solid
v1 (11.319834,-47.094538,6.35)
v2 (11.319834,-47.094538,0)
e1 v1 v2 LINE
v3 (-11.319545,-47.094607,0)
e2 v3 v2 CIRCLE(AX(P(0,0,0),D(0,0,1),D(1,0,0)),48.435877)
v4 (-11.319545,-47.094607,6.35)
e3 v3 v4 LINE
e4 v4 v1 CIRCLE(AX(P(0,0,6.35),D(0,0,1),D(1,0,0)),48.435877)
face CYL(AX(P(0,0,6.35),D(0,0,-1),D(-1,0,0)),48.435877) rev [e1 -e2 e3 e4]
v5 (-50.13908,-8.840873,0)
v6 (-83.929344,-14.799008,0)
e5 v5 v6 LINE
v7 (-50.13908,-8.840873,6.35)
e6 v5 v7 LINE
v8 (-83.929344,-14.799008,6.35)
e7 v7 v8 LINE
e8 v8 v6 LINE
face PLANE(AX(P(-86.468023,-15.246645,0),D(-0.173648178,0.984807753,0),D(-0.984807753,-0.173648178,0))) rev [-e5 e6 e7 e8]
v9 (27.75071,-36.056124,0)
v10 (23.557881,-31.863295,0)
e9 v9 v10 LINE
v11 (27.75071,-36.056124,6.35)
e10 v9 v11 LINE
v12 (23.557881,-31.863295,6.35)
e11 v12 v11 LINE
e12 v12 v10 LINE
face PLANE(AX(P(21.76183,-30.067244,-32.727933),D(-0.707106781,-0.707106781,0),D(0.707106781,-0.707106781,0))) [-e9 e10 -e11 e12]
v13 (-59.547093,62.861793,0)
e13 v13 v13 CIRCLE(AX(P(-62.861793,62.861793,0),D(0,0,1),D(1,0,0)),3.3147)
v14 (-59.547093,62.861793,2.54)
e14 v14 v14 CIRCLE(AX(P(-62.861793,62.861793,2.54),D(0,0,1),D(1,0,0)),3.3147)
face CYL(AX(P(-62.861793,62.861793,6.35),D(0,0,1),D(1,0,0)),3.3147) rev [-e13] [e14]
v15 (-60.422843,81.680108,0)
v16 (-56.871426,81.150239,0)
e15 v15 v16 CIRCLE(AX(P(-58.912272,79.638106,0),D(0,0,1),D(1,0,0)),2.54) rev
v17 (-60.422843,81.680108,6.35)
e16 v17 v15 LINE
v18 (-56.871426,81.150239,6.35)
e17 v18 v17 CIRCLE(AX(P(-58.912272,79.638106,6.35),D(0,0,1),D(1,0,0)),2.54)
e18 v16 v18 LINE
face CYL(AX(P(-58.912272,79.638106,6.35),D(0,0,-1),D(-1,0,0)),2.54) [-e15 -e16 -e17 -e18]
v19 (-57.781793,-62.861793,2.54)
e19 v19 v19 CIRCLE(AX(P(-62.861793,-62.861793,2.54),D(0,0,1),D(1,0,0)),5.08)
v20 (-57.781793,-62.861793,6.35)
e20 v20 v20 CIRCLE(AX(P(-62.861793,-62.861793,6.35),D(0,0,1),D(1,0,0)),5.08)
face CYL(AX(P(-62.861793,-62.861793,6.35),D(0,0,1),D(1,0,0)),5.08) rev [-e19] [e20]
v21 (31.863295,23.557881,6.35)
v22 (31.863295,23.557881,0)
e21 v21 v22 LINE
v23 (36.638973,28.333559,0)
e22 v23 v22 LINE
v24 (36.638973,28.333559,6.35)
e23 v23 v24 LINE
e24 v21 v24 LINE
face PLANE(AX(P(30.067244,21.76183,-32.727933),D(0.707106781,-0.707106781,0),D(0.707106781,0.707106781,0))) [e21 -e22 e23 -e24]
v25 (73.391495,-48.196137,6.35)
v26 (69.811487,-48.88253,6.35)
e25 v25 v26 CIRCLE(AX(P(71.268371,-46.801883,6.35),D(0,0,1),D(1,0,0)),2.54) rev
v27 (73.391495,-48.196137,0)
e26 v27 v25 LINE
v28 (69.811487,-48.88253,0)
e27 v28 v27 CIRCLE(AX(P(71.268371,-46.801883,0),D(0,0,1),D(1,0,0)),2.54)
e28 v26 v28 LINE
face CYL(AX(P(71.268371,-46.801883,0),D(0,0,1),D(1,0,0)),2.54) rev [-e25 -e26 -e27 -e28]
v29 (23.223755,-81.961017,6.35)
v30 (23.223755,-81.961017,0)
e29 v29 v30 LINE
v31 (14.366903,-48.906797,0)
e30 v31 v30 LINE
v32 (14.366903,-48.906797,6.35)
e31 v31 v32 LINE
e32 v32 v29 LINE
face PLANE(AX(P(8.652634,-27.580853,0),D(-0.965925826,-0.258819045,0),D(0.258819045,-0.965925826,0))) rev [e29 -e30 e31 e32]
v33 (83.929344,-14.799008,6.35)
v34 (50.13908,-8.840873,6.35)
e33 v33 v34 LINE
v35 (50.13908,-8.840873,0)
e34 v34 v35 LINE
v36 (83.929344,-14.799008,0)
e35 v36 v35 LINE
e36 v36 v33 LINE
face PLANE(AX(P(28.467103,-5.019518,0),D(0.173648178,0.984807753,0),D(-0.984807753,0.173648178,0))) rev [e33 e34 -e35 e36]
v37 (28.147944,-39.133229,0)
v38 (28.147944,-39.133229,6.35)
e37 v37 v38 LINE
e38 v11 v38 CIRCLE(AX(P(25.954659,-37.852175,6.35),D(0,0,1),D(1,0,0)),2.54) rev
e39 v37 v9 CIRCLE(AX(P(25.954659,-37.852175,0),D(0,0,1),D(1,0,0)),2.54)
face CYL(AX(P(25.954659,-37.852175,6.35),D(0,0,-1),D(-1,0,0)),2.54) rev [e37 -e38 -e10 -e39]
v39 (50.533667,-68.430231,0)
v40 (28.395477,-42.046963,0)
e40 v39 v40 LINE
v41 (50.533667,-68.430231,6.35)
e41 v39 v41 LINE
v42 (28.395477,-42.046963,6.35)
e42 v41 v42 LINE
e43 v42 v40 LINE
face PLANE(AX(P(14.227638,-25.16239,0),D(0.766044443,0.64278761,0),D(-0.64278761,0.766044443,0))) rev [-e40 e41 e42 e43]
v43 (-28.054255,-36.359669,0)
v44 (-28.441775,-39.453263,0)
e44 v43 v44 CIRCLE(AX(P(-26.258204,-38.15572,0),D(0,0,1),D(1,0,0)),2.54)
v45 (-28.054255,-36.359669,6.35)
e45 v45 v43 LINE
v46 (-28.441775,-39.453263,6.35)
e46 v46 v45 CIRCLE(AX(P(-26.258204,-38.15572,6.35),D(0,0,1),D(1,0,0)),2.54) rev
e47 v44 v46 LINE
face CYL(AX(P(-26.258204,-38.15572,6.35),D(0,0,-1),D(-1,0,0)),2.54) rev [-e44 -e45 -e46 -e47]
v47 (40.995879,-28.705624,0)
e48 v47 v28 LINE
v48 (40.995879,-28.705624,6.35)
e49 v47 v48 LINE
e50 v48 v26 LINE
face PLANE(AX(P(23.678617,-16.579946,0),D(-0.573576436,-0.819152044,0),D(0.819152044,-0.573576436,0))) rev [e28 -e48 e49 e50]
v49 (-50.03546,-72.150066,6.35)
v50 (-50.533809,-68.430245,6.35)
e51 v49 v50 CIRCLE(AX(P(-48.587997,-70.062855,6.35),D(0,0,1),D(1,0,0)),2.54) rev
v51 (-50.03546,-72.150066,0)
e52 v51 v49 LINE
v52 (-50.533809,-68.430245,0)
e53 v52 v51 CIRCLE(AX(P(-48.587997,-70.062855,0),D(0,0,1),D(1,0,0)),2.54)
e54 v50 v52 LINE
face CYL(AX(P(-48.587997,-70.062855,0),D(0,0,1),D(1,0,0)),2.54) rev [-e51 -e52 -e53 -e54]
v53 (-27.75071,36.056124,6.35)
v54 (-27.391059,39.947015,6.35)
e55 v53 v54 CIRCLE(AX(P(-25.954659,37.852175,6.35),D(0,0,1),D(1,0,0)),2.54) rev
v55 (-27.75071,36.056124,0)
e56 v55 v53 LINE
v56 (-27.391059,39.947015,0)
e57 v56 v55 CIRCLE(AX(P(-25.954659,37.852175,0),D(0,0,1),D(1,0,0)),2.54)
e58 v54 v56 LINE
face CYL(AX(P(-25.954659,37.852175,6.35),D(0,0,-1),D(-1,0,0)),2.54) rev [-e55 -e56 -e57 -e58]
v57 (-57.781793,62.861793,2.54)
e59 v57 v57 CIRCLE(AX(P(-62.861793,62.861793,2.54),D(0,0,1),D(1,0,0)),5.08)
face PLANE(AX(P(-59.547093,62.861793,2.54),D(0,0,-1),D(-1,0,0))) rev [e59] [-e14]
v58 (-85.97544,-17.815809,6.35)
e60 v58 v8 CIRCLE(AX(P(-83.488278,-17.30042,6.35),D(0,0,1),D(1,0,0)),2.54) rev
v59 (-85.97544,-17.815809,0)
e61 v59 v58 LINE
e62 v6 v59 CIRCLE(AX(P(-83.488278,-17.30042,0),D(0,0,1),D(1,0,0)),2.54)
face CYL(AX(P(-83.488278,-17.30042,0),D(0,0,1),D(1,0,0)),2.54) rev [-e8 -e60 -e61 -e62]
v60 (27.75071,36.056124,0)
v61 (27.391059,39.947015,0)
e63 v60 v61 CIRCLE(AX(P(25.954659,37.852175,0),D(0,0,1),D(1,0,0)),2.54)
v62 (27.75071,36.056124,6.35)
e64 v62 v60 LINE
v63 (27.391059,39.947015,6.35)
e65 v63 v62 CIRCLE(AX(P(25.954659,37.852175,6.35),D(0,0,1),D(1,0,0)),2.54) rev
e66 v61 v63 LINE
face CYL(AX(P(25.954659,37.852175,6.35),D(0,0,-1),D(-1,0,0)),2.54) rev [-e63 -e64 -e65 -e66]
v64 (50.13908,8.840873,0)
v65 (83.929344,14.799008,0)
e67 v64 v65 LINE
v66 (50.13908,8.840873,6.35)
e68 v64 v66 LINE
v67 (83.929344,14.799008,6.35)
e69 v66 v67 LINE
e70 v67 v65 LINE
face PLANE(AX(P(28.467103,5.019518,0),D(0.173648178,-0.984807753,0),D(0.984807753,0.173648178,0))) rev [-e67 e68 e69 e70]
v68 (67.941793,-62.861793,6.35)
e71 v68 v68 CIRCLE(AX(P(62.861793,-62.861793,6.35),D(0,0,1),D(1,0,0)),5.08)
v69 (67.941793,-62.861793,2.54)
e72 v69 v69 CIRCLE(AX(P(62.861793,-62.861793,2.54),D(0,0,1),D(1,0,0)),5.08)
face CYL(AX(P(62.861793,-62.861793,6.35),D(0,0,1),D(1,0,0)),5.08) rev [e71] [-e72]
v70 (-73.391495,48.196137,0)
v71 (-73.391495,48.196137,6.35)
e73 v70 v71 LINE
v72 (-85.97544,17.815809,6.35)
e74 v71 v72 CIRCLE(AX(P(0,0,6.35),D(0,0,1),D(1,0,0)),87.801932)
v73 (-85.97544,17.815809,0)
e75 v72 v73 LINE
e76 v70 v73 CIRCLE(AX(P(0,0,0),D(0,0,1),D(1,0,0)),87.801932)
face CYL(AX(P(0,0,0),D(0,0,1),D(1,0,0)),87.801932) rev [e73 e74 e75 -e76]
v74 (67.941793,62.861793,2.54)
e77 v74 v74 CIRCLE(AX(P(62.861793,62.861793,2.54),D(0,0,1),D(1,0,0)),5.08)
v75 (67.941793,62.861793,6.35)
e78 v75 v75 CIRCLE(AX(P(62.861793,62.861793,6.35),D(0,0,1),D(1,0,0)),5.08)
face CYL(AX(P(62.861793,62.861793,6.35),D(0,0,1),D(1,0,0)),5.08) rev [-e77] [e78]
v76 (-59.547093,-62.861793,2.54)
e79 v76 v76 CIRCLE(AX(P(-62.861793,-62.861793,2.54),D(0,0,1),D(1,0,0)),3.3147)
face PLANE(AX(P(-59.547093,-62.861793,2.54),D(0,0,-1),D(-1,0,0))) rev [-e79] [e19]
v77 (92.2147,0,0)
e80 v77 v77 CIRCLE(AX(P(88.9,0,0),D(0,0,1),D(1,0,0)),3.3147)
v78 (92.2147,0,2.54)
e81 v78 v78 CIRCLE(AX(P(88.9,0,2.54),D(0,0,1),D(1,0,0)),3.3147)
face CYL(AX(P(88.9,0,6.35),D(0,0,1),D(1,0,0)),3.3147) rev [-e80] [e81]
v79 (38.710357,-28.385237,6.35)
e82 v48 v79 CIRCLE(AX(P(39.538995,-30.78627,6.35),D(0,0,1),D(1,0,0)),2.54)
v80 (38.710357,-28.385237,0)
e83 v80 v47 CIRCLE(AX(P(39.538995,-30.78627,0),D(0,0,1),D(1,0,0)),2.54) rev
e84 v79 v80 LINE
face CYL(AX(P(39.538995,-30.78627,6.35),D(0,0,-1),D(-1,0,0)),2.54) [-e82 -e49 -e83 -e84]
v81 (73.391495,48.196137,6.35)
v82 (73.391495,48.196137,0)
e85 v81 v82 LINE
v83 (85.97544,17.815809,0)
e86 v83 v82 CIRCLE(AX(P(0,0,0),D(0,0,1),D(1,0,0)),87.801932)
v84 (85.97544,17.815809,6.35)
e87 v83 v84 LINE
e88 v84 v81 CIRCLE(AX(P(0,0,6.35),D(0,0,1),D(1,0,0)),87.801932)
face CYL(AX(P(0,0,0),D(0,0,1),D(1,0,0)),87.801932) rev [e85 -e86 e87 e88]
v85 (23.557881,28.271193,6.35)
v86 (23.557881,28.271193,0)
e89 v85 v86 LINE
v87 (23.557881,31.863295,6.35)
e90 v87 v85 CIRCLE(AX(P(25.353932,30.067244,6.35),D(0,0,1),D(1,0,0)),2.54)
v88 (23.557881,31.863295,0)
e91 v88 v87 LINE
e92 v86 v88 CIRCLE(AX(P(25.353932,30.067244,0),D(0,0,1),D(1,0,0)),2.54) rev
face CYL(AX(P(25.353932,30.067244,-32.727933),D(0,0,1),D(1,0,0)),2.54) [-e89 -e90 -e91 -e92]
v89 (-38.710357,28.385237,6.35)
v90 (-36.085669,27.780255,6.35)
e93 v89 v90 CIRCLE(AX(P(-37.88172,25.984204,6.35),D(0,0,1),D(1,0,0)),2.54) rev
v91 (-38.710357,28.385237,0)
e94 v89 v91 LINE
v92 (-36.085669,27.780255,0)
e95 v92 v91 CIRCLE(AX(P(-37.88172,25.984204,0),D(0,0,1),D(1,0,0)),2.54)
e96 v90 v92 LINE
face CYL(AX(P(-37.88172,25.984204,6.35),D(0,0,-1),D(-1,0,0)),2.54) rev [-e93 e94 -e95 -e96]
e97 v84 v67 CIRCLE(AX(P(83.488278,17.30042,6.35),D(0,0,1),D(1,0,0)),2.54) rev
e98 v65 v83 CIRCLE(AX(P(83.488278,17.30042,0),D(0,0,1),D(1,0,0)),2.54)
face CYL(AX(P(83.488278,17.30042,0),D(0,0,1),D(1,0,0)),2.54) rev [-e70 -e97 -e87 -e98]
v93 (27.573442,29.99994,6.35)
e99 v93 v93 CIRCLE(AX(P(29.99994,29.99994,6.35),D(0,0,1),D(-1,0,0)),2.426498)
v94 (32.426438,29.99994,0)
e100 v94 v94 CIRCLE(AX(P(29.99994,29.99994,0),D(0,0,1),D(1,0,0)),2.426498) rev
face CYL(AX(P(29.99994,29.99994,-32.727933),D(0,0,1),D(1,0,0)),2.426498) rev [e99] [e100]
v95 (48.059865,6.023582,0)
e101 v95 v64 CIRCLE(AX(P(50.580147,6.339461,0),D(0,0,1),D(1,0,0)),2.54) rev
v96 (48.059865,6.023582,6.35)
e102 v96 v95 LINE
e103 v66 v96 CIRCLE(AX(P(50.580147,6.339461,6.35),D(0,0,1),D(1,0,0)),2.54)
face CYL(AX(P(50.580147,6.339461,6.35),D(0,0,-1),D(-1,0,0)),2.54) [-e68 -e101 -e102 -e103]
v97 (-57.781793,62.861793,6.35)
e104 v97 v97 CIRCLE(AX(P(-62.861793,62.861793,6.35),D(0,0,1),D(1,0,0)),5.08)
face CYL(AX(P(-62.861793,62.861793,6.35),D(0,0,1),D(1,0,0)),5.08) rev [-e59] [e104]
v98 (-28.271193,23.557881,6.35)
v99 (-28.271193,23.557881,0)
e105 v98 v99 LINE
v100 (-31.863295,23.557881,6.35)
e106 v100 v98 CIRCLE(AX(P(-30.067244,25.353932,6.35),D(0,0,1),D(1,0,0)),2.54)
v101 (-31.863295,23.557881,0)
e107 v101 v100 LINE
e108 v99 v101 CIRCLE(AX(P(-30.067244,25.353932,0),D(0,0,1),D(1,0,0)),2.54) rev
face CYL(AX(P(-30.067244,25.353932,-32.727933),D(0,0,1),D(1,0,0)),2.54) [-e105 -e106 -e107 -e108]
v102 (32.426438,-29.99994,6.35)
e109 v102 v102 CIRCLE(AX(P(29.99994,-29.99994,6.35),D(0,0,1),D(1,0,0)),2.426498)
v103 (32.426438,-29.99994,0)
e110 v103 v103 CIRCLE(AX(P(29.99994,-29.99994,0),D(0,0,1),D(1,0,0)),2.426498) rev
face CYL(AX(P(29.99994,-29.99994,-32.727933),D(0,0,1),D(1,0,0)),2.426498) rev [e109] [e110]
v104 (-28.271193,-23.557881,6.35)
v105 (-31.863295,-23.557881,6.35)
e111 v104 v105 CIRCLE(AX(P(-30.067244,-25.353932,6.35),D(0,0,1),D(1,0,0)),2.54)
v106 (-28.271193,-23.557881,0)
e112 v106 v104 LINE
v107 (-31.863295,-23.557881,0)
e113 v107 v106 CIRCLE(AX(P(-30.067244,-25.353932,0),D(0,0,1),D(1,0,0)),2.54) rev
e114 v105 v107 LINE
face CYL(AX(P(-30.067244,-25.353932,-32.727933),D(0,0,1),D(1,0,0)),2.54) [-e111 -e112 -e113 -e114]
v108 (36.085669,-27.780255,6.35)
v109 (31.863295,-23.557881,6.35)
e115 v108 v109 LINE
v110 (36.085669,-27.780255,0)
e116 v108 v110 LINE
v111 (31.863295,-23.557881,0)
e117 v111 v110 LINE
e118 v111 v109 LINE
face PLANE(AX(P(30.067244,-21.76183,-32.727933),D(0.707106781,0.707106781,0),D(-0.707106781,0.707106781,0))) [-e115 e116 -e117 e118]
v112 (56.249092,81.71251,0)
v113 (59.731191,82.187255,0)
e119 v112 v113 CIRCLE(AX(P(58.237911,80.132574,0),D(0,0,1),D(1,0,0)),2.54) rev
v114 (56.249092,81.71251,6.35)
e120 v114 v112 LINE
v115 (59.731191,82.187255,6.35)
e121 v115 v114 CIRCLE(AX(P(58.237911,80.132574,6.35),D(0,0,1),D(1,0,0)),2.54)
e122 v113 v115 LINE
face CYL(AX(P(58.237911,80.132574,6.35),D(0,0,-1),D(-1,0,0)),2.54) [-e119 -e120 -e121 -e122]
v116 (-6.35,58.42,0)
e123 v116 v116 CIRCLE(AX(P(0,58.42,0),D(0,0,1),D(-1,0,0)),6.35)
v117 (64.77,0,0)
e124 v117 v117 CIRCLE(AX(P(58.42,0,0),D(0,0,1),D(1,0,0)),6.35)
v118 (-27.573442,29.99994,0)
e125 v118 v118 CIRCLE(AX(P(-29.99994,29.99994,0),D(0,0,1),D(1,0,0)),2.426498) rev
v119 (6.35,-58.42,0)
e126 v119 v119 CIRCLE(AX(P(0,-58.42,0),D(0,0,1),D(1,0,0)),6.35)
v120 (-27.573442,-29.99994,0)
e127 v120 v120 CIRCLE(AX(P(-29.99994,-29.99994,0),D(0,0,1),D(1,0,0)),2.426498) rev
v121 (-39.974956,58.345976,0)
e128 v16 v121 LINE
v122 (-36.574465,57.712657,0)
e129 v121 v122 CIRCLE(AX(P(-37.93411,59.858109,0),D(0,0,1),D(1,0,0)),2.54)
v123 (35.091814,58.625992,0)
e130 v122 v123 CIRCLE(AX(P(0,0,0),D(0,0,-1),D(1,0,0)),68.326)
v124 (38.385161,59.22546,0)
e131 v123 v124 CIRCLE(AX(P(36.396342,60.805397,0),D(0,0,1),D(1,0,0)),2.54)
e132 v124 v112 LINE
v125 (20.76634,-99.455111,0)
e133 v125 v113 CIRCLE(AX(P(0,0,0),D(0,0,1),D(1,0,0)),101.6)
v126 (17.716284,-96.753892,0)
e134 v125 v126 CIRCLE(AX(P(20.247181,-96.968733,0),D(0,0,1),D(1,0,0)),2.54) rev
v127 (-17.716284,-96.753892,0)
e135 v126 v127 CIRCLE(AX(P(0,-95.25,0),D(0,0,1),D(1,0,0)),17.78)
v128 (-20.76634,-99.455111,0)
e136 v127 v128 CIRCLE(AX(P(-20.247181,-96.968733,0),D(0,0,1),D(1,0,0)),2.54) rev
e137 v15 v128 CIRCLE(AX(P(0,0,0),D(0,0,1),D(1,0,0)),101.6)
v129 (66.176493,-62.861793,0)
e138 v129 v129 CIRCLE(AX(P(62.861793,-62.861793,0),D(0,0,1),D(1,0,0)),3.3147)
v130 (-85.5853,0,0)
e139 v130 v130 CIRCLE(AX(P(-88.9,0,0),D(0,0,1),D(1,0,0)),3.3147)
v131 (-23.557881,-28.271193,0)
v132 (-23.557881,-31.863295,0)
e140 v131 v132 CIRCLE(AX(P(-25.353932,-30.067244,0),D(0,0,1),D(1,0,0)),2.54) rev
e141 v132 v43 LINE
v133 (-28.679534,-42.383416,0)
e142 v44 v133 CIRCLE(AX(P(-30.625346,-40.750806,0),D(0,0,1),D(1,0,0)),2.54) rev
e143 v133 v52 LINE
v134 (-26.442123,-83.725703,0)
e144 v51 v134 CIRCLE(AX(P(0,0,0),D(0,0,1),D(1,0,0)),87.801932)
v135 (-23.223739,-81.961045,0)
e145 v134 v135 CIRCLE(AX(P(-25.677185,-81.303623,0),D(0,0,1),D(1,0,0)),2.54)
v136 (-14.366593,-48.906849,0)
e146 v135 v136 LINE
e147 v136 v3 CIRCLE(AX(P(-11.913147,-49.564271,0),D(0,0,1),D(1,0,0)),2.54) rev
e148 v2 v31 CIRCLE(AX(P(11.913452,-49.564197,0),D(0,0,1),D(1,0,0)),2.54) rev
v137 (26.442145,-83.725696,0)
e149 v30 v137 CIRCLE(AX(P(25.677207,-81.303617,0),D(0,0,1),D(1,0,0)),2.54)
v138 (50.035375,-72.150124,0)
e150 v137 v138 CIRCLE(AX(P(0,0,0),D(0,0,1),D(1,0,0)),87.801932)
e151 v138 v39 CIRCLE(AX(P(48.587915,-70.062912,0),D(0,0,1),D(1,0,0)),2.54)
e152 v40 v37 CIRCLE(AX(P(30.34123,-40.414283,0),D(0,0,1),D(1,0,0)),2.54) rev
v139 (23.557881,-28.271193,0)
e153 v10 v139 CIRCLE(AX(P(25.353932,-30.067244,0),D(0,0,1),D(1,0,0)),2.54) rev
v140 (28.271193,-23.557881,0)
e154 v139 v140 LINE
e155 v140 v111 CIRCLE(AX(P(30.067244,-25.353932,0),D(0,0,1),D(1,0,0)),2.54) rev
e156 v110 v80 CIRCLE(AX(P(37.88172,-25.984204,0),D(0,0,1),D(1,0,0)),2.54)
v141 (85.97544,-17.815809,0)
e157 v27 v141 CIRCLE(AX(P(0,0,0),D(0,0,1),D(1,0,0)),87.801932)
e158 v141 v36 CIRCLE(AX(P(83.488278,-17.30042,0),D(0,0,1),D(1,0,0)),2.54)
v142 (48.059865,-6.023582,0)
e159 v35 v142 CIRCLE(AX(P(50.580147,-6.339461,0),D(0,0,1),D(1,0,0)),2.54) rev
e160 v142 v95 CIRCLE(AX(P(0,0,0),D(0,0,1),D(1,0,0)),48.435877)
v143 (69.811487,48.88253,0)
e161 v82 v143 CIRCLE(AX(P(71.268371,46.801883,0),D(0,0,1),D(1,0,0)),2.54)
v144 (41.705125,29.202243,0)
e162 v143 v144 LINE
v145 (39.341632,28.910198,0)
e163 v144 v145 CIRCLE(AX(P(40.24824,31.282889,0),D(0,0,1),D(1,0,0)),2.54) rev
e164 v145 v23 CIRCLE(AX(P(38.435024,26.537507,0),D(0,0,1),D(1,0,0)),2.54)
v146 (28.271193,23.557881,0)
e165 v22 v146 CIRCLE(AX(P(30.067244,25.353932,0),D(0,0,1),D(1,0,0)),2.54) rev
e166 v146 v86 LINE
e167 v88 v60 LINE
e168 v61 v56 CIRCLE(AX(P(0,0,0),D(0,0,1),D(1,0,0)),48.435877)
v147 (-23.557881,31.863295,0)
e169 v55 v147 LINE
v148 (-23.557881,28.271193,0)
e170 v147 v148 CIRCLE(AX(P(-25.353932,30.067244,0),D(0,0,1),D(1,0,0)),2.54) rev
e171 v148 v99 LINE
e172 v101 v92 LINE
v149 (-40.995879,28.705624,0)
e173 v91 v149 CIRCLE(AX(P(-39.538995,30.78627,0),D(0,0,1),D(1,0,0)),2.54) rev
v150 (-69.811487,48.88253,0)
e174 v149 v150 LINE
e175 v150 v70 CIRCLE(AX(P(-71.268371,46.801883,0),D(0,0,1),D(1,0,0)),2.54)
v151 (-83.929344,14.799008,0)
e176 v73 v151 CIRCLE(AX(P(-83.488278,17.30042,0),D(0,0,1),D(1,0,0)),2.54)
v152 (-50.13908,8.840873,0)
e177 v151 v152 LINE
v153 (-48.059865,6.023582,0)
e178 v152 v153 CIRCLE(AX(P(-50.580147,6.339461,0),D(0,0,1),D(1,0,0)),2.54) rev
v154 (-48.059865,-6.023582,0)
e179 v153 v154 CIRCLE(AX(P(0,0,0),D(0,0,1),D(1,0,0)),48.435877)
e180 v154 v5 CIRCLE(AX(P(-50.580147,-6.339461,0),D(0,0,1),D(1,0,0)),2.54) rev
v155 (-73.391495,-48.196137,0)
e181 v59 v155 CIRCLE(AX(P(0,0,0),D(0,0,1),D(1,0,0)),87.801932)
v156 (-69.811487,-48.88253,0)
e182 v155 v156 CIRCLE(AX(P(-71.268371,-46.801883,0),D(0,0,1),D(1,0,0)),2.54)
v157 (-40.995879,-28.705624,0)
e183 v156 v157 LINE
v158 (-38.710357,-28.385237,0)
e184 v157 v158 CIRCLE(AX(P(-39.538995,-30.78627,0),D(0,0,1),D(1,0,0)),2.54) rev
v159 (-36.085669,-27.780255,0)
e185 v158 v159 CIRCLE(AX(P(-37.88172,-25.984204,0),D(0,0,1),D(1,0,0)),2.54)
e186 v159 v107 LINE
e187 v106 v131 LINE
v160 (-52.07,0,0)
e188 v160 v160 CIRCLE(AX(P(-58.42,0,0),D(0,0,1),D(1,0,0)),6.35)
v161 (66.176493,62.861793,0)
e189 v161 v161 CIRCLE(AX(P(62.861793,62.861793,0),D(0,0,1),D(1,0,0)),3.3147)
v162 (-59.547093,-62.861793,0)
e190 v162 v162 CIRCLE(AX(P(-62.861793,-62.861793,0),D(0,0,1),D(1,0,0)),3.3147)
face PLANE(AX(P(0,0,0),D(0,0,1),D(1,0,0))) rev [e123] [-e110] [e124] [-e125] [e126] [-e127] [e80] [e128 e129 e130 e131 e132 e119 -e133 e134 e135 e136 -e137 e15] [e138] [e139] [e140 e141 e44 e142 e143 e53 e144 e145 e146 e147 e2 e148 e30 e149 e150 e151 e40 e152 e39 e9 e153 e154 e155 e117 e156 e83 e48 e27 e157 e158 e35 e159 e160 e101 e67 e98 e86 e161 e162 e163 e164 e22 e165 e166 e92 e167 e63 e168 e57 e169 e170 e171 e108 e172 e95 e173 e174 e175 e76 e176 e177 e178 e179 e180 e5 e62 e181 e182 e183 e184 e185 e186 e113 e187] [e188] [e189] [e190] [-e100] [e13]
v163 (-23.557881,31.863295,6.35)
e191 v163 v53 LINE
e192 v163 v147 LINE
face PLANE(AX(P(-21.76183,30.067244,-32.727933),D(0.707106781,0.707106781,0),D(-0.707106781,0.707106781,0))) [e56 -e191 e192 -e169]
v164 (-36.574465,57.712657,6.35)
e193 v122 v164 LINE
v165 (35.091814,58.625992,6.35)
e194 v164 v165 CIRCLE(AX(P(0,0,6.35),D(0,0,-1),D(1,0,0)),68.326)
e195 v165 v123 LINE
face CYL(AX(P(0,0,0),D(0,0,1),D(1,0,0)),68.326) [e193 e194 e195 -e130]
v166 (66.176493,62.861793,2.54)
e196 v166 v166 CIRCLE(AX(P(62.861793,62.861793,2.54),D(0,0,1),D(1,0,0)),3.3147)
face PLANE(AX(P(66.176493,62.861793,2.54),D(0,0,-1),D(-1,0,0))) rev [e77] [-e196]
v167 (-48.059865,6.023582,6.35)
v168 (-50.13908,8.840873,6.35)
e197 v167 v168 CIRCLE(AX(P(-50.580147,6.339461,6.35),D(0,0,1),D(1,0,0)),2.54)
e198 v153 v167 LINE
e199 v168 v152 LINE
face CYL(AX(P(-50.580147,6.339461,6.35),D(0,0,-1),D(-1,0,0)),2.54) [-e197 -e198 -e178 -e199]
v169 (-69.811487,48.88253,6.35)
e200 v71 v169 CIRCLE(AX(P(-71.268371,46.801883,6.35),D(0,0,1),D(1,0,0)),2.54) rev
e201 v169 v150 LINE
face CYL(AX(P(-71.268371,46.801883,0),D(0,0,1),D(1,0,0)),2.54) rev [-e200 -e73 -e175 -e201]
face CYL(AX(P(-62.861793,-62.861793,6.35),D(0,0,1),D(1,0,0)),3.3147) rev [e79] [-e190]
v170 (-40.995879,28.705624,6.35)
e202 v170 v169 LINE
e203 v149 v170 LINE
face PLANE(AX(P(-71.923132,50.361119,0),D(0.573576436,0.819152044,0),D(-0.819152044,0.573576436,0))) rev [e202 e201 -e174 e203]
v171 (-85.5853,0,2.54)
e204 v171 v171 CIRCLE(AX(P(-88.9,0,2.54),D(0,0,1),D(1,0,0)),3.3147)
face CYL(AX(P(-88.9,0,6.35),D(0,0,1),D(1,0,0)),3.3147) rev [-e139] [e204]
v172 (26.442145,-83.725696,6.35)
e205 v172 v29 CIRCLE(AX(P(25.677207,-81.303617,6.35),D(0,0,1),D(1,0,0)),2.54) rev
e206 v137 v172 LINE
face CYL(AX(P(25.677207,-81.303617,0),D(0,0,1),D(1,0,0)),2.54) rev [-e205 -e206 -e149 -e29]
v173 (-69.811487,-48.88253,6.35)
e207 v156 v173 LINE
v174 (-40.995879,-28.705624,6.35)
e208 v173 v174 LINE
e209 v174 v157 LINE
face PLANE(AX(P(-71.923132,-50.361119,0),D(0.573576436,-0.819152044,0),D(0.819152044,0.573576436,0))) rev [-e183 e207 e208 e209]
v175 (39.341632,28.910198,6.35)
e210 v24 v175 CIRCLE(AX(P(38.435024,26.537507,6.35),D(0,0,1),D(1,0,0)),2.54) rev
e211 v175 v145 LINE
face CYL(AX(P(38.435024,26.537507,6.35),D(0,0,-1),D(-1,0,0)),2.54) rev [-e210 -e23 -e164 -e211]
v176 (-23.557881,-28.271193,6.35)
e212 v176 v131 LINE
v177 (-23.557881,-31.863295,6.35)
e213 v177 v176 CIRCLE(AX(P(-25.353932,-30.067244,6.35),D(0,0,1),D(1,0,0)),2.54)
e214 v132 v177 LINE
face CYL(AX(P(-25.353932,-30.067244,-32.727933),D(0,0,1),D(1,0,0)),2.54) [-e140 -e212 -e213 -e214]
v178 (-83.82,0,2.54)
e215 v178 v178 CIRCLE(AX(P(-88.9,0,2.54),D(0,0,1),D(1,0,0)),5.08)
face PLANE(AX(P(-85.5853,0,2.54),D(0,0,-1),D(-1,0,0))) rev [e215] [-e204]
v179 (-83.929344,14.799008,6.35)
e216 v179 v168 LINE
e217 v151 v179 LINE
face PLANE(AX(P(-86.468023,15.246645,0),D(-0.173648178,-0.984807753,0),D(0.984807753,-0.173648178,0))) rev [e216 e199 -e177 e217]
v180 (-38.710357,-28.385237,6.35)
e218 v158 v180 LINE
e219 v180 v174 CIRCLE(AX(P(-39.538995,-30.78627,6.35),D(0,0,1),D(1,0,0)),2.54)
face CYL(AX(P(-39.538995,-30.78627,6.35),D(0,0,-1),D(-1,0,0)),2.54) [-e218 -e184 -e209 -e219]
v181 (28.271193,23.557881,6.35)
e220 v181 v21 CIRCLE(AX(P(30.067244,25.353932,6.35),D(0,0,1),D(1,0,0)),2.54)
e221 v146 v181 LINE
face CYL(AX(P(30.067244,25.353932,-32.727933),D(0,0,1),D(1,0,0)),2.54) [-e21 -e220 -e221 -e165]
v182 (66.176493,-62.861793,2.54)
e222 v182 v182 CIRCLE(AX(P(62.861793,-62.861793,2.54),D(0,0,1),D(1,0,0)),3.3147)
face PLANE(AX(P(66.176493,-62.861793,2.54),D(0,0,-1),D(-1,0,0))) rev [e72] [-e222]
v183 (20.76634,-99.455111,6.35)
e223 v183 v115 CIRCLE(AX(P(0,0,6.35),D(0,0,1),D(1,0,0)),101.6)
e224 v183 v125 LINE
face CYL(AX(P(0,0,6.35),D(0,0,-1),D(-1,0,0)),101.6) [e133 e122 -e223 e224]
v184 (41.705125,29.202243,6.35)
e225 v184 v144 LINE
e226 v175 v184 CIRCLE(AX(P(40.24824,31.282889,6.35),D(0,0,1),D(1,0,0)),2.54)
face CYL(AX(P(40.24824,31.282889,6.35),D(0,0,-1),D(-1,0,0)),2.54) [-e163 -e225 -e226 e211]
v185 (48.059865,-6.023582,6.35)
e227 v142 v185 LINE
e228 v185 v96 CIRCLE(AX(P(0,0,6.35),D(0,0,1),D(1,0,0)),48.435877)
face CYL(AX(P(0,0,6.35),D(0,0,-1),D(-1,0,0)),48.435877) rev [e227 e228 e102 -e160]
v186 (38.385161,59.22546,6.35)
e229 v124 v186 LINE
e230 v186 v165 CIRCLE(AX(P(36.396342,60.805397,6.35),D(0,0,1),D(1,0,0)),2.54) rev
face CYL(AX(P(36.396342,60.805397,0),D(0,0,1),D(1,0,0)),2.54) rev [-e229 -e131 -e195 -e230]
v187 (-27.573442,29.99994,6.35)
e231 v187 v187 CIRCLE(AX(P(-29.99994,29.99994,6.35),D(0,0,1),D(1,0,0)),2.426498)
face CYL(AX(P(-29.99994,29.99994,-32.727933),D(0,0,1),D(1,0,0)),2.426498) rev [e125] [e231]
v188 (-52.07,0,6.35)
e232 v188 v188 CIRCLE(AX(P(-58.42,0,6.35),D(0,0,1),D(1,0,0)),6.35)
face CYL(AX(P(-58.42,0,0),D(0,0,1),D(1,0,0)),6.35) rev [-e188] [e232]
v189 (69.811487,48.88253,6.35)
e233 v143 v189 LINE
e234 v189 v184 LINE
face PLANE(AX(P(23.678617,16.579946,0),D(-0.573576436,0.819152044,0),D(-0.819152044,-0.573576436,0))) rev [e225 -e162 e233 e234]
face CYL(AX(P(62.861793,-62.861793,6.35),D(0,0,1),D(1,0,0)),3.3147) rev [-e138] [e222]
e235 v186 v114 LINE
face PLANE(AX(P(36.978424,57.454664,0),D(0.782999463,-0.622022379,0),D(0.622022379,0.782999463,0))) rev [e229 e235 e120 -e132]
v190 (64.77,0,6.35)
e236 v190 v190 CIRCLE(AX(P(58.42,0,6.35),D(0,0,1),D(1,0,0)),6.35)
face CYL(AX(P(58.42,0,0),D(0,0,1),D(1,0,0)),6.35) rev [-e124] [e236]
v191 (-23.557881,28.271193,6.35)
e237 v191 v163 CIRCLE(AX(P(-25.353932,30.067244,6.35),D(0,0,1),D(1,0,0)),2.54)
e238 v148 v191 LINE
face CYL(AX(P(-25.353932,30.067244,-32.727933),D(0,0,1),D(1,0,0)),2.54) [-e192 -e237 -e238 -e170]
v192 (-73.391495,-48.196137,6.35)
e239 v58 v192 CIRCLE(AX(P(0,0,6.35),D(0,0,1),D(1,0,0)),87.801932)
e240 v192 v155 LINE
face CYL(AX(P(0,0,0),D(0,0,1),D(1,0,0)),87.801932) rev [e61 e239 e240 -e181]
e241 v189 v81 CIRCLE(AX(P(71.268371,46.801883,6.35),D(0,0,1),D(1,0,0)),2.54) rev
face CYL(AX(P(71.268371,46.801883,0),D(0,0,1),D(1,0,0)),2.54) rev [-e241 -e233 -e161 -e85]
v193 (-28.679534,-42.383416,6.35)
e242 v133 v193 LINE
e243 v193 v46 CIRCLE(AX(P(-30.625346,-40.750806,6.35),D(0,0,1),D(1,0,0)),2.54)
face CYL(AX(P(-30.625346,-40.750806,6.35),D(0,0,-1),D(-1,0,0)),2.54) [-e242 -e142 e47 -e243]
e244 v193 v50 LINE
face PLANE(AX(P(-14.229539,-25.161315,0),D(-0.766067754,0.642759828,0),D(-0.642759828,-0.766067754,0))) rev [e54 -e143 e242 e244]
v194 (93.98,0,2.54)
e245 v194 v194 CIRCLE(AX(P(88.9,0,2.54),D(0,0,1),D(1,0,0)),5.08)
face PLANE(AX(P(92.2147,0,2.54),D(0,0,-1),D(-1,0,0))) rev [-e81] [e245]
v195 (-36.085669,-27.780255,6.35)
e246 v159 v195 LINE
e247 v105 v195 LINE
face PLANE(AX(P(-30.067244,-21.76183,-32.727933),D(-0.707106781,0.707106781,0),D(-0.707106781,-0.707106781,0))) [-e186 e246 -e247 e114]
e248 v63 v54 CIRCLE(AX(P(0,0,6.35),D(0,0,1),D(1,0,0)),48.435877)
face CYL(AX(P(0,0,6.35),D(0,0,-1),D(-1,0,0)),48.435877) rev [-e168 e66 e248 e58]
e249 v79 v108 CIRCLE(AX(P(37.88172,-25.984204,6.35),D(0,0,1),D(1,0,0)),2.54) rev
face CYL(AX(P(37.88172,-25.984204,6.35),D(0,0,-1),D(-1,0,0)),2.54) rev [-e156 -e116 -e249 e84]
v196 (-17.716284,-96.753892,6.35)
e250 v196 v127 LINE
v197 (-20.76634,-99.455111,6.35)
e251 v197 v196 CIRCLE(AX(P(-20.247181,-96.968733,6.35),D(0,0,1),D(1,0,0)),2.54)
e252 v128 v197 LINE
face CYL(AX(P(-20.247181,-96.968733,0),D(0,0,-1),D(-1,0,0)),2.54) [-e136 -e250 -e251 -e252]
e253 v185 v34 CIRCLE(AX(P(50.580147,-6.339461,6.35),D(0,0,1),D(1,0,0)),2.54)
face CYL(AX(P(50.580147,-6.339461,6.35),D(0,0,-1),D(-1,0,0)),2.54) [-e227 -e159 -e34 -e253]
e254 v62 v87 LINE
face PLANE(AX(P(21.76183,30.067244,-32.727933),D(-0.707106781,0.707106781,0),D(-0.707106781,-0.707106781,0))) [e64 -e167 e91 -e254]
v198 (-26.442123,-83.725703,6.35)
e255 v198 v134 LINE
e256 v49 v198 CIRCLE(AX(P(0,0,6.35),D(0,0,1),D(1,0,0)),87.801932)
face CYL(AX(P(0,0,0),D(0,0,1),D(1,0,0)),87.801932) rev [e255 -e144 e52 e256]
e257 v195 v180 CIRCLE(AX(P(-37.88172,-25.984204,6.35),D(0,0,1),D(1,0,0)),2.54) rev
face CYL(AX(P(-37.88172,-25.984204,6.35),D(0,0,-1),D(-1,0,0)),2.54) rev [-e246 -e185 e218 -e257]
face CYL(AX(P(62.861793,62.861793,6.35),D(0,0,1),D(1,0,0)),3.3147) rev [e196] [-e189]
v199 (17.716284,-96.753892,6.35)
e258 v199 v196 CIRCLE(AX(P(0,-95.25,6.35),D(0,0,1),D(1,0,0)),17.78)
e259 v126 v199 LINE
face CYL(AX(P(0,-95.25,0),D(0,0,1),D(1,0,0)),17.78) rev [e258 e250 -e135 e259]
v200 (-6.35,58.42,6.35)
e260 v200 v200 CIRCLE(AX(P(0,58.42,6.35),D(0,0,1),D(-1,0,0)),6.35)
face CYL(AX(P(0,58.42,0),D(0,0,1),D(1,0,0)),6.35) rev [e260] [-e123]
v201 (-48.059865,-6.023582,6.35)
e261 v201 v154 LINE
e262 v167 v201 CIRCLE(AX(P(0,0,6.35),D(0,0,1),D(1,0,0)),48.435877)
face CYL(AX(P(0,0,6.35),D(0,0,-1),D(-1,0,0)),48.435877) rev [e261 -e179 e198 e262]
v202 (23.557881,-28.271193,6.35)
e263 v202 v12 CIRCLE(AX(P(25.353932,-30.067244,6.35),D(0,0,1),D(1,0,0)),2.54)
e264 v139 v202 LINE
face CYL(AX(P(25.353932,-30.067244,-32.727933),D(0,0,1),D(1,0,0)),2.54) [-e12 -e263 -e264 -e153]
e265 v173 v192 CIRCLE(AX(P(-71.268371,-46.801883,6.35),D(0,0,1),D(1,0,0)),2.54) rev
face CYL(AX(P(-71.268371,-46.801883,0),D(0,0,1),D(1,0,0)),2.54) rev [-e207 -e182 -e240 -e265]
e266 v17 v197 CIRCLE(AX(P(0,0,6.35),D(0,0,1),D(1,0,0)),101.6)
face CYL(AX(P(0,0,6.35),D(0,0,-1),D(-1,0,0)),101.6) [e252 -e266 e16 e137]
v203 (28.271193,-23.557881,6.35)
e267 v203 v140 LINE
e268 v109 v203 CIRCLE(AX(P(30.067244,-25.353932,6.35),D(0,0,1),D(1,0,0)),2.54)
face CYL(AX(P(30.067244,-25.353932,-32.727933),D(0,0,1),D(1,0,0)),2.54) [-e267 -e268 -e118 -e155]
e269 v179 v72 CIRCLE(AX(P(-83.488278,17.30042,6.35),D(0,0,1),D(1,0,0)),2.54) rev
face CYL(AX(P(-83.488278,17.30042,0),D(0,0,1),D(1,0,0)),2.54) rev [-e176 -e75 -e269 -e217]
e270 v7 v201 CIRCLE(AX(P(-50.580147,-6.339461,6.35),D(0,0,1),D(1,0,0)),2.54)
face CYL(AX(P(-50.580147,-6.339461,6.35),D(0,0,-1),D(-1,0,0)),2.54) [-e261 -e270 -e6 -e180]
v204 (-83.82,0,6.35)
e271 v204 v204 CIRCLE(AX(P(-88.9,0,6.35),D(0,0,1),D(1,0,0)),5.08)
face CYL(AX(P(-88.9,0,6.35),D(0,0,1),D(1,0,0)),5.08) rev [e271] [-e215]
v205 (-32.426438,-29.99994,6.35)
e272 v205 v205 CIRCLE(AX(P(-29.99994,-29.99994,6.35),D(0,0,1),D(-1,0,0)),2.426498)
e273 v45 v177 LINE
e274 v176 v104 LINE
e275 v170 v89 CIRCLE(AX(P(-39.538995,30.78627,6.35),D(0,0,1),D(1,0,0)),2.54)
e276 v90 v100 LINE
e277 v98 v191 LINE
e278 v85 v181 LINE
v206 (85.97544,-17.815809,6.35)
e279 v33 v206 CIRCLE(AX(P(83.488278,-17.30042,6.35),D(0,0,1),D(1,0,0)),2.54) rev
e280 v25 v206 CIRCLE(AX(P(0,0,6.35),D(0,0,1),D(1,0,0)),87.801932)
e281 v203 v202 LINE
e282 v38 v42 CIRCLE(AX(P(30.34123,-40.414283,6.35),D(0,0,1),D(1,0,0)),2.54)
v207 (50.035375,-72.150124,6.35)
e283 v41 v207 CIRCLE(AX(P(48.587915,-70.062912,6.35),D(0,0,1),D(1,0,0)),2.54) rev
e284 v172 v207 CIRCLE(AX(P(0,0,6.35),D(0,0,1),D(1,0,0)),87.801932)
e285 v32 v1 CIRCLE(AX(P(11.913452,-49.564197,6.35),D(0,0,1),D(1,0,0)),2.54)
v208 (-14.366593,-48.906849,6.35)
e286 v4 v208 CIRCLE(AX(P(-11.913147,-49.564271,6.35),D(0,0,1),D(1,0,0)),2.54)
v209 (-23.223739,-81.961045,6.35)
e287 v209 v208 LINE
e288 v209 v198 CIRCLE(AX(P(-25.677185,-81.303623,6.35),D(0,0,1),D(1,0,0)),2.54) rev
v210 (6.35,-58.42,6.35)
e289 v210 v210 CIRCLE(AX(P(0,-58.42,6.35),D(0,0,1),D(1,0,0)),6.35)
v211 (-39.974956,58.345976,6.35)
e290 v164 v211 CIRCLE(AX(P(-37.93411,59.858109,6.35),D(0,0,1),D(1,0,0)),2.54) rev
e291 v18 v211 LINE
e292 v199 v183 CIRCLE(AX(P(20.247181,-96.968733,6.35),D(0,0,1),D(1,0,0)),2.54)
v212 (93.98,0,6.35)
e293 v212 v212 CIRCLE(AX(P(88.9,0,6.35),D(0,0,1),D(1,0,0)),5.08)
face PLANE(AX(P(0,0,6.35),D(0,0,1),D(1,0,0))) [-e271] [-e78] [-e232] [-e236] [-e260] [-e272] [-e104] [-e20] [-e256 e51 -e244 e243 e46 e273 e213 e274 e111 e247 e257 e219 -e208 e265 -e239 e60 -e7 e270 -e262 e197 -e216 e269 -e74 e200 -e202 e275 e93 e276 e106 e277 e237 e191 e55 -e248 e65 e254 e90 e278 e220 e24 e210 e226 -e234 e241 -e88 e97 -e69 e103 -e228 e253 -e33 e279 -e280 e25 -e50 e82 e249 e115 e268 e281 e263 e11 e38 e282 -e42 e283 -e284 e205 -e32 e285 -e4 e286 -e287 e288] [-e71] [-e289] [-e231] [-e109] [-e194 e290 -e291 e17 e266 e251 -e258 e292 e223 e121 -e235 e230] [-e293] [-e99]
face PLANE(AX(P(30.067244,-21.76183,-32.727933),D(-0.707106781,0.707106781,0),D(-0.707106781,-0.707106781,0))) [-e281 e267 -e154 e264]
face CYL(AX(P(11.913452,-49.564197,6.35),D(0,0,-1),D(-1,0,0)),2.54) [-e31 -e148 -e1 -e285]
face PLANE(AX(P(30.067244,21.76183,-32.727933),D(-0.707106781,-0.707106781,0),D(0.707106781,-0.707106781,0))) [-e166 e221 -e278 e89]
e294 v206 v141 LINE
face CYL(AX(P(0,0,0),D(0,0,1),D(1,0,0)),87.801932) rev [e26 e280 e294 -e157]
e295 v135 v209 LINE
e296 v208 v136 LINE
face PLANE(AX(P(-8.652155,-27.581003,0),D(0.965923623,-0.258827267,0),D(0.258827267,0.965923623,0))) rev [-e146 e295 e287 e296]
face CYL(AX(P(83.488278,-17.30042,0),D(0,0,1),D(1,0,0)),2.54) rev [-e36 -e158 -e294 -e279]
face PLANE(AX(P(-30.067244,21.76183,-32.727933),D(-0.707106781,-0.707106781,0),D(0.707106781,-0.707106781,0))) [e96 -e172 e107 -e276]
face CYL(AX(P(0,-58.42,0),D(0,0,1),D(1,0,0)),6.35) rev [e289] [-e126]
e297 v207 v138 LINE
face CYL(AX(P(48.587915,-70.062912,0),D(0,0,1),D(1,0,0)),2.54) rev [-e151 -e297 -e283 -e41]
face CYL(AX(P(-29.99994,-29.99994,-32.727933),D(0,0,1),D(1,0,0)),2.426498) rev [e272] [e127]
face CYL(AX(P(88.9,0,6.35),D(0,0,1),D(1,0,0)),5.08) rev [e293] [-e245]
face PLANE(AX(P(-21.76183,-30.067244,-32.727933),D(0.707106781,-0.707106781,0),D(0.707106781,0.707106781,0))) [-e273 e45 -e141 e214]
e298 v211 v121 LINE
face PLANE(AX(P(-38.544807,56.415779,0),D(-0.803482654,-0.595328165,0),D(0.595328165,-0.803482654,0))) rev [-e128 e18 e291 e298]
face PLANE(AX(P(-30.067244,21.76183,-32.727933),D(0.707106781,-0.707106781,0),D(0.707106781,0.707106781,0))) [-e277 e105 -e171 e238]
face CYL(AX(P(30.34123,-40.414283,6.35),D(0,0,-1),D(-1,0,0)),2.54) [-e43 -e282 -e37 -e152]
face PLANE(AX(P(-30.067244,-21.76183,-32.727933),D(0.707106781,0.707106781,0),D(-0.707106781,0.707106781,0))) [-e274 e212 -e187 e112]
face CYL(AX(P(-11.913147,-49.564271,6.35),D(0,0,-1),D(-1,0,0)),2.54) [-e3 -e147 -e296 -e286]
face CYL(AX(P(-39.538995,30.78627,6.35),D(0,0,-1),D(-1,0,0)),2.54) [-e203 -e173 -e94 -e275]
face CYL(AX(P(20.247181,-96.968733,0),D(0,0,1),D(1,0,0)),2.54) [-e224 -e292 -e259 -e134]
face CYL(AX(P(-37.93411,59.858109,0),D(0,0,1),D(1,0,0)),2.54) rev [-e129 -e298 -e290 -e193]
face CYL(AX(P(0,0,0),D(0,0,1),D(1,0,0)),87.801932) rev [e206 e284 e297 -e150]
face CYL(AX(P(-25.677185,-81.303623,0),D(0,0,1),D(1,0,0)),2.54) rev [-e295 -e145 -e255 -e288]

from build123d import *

# Parameters (mm, degrees)
SKETCH1_R                                        = 101.6
SKETCH1_R_2                                      = 48.435876627
EXTRUDE1_DEPTH                                   = 6.35
CBORE_FOR_1_4_SOCKET_HEAD_CAP_SCREW1_D           = 6.6294
CBORE_FOR_1_4_SOCKET_HEAD_CAP_SCREW1_CBORE_D     = 10.16
CBORE_FOR_1_4_SOCKET_HEAD_CAP_SCREW1_CBORE_DEPTH = 3.81
SKETCH11_R                                       = 17.78
CUT_EXTRUDE1_DEPTH                               = 144.824345992
SKETCH12_R                                       = 6.35
CUT_EXTRUDE2_DEPTH                               = 144.824345992
SKETCH13_R                                       = 2.426498152
EXTRUDE2_DEPTH                                   = 6.35
CUT_EXTRUDE3_DEPTH                               = 6.35
FILLET1_R                                        = 2.54
FILLET2_R                                        = 2.54
FILLET3_R                                        = 2.54
FILLET4_R                                        = 2.54
FILLET5_R                                        = 2.54
FILLET6_R                                        = 2.54
FILLET9_R                                        = 2.54


with BuildPart() as part:
    # Sketch1 → Extrude1 (new body)
    with BuildSketch(Plane.XY):
        Circle(SKETCH1_R)
        Circle(SKETCH1_R_2, mode=Mode.SUBTRACT)
    extrude(amount=EXTRUDE1_DEPTH)

    # CBORE for 1/4 Socket Head Cap Screw1 (through all)
    with Locations(Plane.XY.offset(6.35)):
        with Locations((62.861792847, -62.861792847), (88.9, 0), (62.861792847, 62.861792847), (-62.861792847, 62.861792847), (-88.9, 0), (-62.861792847, -62.861792847)):
            CounterBoreHole(CBORE_FOR_1_4_SOCKET_HEAD_CAP_SCREW1_D / 2, CBORE_FOR_1_4_SOCKET_HEAD_CAP_SCREW1_CBORE_D / 2, CBORE_FOR_1_4_SOCKET_HEAD_CAP_SCREW1_CBORE_DEPTH)

    # Sketch11 → Cut-Extrude1 (cut, through all)
    with BuildSketch(Plane.XY.offset(6.35)):
        with Locations((0, -95.25)):
            Circle(SKETCH11_R)
    extrude(amount=-CUT_EXTRUDE1_DEPTH, mode=Mode.SUBTRACT)

    # Sketch12 → Cut-Extrude2 (cut, through all)
    with BuildSketch(Plane.XY.offset(6.35)):
        with Locations((0, -58.42)):
            Circle(SKETCH12_R)
        with Locations((-58.42, 0)):
            Circle(SKETCH12_R)
        with Locations((58.42, 0)):
            Circle(SKETCH12_R)
        with Locations(Location((0, 58.42, 0), (0, 0, 180))):
            Circle(SKETCH12_R)
    extrude(amount=-CUT_EXTRUDE2_DEPTH, mode=Mode.SUBTRACT)

    # Sketch13 → Extrude2 (add)
    # profile 1 of 4: a face of its own
    with BuildSketch(Plane.XY.offset(6.35)):
        Polygon((30.067243726, -21.76182967), (44.903973325, -36.598559269), (36.598559269, -44.903973325), (21.76182967, -30.067243726), align=None)
        with Locations((29.99994, -29.99994)):
            Circle(SKETCH13_R, mode=Mode.SUBTRACT)
    # profile 2 of 4: a face of its own
    with BuildSketch(Plane.XY.offset(6.35)):
        Polygon((-30.067243726, -21.76182967), (-44.903973325, -36.598559269), (-36.598559269, -44.903973325), (-21.76182967, -30.067243726), align=None)
        with Locations((-29.99994, -29.99994)):
            Circle(SKETCH13_R, mode=Mode.SUBTRACT)
    # profile 3 of 4: a face of its own
    with BuildSketch(Plane.XY.offset(6.35)):
        Polygon((-30.067243726, 21.76182967), (-21.76182967, 30.067243726), (-36.598559269, 44.903973325), (-44.903973325, 36.598559269), align=None)
        with Locations((-29.99994, 29.99994)):
            Circle(SKETCH13_R, mode=Mode.SUBTRACT)
    # profile 4 of 4: a face of its own
    with BuildSketch(Plane.XY.offset(6.35)):
        Polygon((30.067243726, 21.76182967), (21.76182967, 30.067243726), (36.598559269, 44.903973325), (44.903973325, 36.598559269), align=None)
        with Locations((29.99994, 29.99994)):
            Circle(SKETCH13_R, mode=Mode.SUBTRACT)
    extrude(amount=-EXTRUDE2_DEPTH)

    # Sketch14 → Cut-Extrude3 (cut)
    with BuildSketch(Plane.XY.offset(6.35)):
        with BuildLine():
            Line((36.978423652, 57.45466439), (71.6832833, 101.141012966))
            Line((71.6832833, 101.141012966), (0, 148.475476712))
            Line((0, 148.475476712), (-71.6832833, 101.141012966))
            Line((-71.6832833, 101.141012966), (-38.544806548, 56.41577939))
            ThreePointArc((-38.544806548, 56.41577939), (-0.939792187, 68.319536493), (36.978423652, 57.45466439))
        make_face()
        with BuildLine():
            Line((8.652633897, -27.580853172), (23.900424698, -84.486383146))
            ThreePointArc((23.900424698, -84.486383146), (38.731626442, -78.797464115), (52.295107345, -70.52943347))
            Line((52.295107345, -70.52943347), (14.227637724, -25.162389788))
            ThreePointArc((14.227637724, -25.162389788), (11.503866682, -26.518532886), (8.652633897, -27.580853172))
        make_face()
        with BuildLine():
            Line((-71.923131973, 50.361119179), (-23.678617266, 16.579946304))
            ThreePointArc((-23.678617266, 16.579946304), (-26.705896668, 11.061944595), (-28.467103301, 5.019518375))
            Line((-28.467103301, 5.019518375), (-86.468023222, 15.246645463))
            ThreePointArc((-86.468023222, 15.246645463), (-81.118407757, 33.600344651), (-71.923131973, 50.361119179))
        make_face()
        with BuildLine():
            Line((-8.652154992, -27.581003409), (-23.900424698, -84.486383146))
            ThreePointArc((-23.900424698, -84.486383146), (-38.731626442, -78.797464115), (-52.295107345, -70.52943347))
            Line((-52.295107345, -70.52943347), (-14.229539169, -25.161314554))
            ThreePointArc((-14.229539169, -25.161314554), (-11.504638432, -26.518198083), (-8.652154992, -27.581003409))
        make_face()
        with BuildLine():
            Line((-86.468023222, -15.246645463), (-28.467103301, -5.019518375))
            ThreePointArc((-28.467103301, -5.019518375), (-26.705896668, -11.061944595), (-23.678617266, -16.579946304))
            Line((-23.678617266, -16.579946304), (-71.923131973, -50.361119179))
            ThreePointArc((-71.923131973, -50.361119179), (-81.118407757, -33.600344651), (-86.468023222, -15.246645463))
        make_face()
        with BuildLine():
            Line((23.678617266, -16.579946304), (71.923131973, -50.361119179))
            ThreePointArc((71.923131973, -50.361119179), (81.118407757, -33.600344651), (86.468023222, -15.246645463))
            Line((86.468023222, -15.246645463), (28.467103301, -5.019518375))
            ThreePointArc((28.467103301, -5.019518375), (26.705896668, -11.061944595), (23.678617266, -16.579946304))
        make_face()
        with BuildLine():
            Line((28.467103301, 5.019518375), (86.468023222, 15.246645463))
            ThreePointArc((86.468023222, 15.246645463), (81.118407757, 33.600344651), (71.923131973, 50.361119179))
            Line((71.923131973, 50.361119179), (23.678617266, 16.579946304))
            ThreePointArc((23.678617266, 16.579946304), (26.705896668, 11.061944595), (28.467103301, 5.019518375))
        make_face()
    extrude(amount=-CUT_EXTRUDE3_DEPTH, mode=Mode.SUBTRACT)

    # Fillet1
    fillet1_edges = [part.edges().sort_by_distance(p)[0] for p in [
        (-21.76182967, -30.067243726, 3.175),
        (-30.067243726, -21.76182967, 3.175),
        (-21.76182967, 30.067243726, 3.175),
        (-30.067243726, 21.76182967, 3.175),
        (21.76182967, 30.067243726, 3.175),
        (30.067243726, 21.76182967, 3.175),
        (-58.363526169, 83.1640476, 3.175),
        (52.295107345, -70.52943347, 3.175),
        (23.900424698, -84.486383146, 3.175),
        (-23.900424698, -84.486383146, 3.175),
        (-52.295107345, -70.52943347, 3.175),
        (47.700026827, -8.41080171, 3.175),
        (86.468023222, -15.246645463, 3.175),
        (71.923131973, -50.361119179, 3.175),
        (-71.923131973, -50.361119179, 3.175),
        (-86.468023222, -15.246645463, 3.175),
        (71.923131973, 50.361119179, 3.175),
        (86.468023222, 15.246645463, 3.175),
        (-86.468023222, 15.246645463, 3.175),
        (-71.923131973, 50.361119179, 3.175),
        (29.843941288, -38.149355343, 3.175),
        (30.067243726, -21.76182967, 3.175),
        (21.76182967, -30.067243726, 3.175),
    ]]
    fillet(fillet1_edges, radius=FILLET1_R)

    # Fillet2
    # the kernel refuses this fillet: 2.54 mm, written as the material it adds along each edge
    with BuildSketch(Plane(origin=(-38.149355343, -29.843941288, 6.35), x_dir=(0.7071067811865481, 0.7071067811865469, 0), z_dir=(0, 0, -1))) as fillet2_piece_1:
        with BuildLine():
            CenterArc((2.918493499, -2.54), FILLET2_R, 90, 89.954594463)
            ThreePointArc((0.378494296, -2.537987111), (0.172436891, -1.271500497), (0, 0))
            Line((0, 0), (2.918493499, 0))
        make_face()
    extrude(amount=6.35)
    # the kernel refuses this fillet: 2.54 mm, written as the material it takes off along each edge
    with BuildSketch(Plane(origin=(39.676347356, 27.781677508, 12.541699401), x_dir=(0.8191520442889919, 0.5735764363510458, 0), z_dir=(0, 0, -1))) as fillet2_2_piece_1:
        with BuildLine():
            CenterArc((2.47667976, -2.54), FILLET2_R, 90, 87.143912429)
            ThreePointArc((-0.060165151, -2.413438175), (-0.015043624, -1.207093997), (0, 0))
            Line((0, 0), (2.47667976, 0))
        make_face()
    extrude(amount=18.733398802, mode=Mode.SUBTRACT)

    # Fillet3
    # the kernel refuses this fillet: 2.54 mm, written as the material it adds along each edge
    with BuildSketch(Plane(origin=(38.149355343, -29.843941288, 6.35), x_dir=(-0.7071067811865487, 0.7071067811865462, 0), z_dir=(0, 0, -1))) as fillet3_piece_1:
        with BuildLine():
            CenterArc((2.918493499, 2.54), FILLET3_R, 180.045405537, 89.954594463)
            ThreePointArc((0.378494296, 2.537987111), (0.172436891, 1.271500497), (0, 0))
            Line((0, 0), (2.918493499, 0))
        make_face()
    extrude(amount=6.35)
    with BuildSketch(Plane(origin=(-29.843941288, 38.149355343, 6.35), x_dir=(0.8065806519344794, 0.5911240579818674, 0), z_dir=(0, 0, -1))) as fillet3_piece_2:
        with BuildLine():
            CenterArc((2.961349729, 2.538748086), FILLET3_R, 171.236815401, 100.562162322)
            Line((0.451000474, 2.925719166), (0, 0))
            ThreePointArc((0, 0), (1.52054388, -0.023873044), (3.041087761, 0))
        make_face()
    extrude(amount=6.35)
    # the kernel refuses this fillet: 2.54 mm, written as the material it takes off along each edge
    with BuildSketch(Plane(origin=(26.907852458, -40.274081253, 12.135832501), x_dir=(0.6427876096865419, -0.7660444431189757, 0), z_dir=(0, 0, -1))) as fillet3_2_piece_1:
        with BuildLine():
            CenterArc((2.314333001, -2.54), FILLET3_R, 90, 70.288335328)
            Line((-0.076827818, -1.683291217), (-0.3159439, -1.597620338))
            ThreePointArc((-0.3159439, -1.597620338), (-0.19275198, -0.605010424), (-0.252489157, -0.027662711))
            Line((-0.252489157, -0.027662711), (0, 0.254))
            Line((0, 0.254), (2.314333001, 0.254))
            Line((2.314333001, 0.254), (2.314333001, 0))
        make_face()
    extrude(amount=17.921665003, mode=Mode.SUBTRACT)
    with BuildSketch(Plane(origin=(13.709958303, -46.455044807, 12.695601727), x_dir=(-0.9660206148643552, -0.2584650298533501, 0), z_dir=(0, 0, -1))) as fillet3_2_piece_2:
        with BuildLine():
            CenterArc((2.539069601, -2.539171394), FILLET3_R, 91.463547204, 88.51545472)
            Line((-0.000930229, -2.53824052), (0, 0))
            ThreePointArc((0, 0), (1.237097807, -0.015800898), (2.474195614, 0))
        make_face()
    extrude(amount=19.041203453, mode=Mode.SUBTRACT)

    # Fillet4
    # the kernel refuses this fillet: 2.54 mm, written as the material it adds along each edge
    with BuildSketch(Plane(origin=(-38.149355343, 29.843941288, 6.35), x_dir=(0.7071067811865475, -0.7071067811865475, 0), z_dir=(0, 0, -1))) as fillet4_piece_1:
        with BuildLine():
            CenterArc((2.918493499, 2.54), FILLET4_R, 180.045405537, 89.954594463)
            ThreePointArc((0.378494296, 2.537987111), (0.172436891, 1.271500497), (0, 0))
            Line((0, 0), (2.918493499, 0))
        make_face()
    extrude(amount=6.35)
    # the kernel refuses this fillet: 2.54 mm, written as the material it takes off along each edge
    with BuildSketch(Plane(origin=(57.744565526, 83.595006742, 12.437099137), x_dir=(0.8159161636630297, -0.5781702291483056, 0), z_dir=(0, 0, -1))) as fillet4_2_piece_1:
        with BuildLine():
            CenterArc((2.404404159, 2.539817647), FILLET4_R, 183.142021244, 87.544540639)
            Line((-0.13177756, 2.400597366), (0, 0))
            ThreePointArc((0, 0), (1.217419827, -0.007294115), (2.434839655, 0))
        make_face()
    extrude(amount=18.524198273, mode=Mode.SUBTRACT)
    with BuildSketch(Plane(origin=(39.676347356, -27.781677508, 10.377126904), x_dir=(-0.8480711193304972, -0.5298824176716165, 0), z_dir=(0, 0, -1))) as fillet4_2_piece_2:
        with BuildLine():
            CenterArc((1.708565245, -2.475327247), FILLET4_R, 102.957083854, 54.040426754)
            Line((-0.62947396, -1.482768596), (0, 0))
            ThreePointArc((0, 0), (0.569521748, -0.064672753), (1.139043497, 0))
        make_face()
    extrude(amount=14.404253807, mode=Mode.SUBTRACT)
    with BuildSketch(Plane(origin=(-47.700026827, -8.41080171, 12.541699401), x_dir=(-0.14905137241774008, 0.988829453637172, 0), z_dir=(0, 0, -1)), Plane(origin=(47.700026827, 8.41080171, 12.541699401), x_dir=(0.14905137241774133, -0.9888294536371718, 0), z_dir=(0, 0, -1))) as fillet4_2_piece_3:
        with BuildLine():
            CenterArc((2.477488567, -2.539211105), FILLET4_R, 91.428043786, 87.143912429)
            Line((-0.061722539, -2.475910532), (0, 0))
            ThreePointArc((0, 0), (1.207093997, -0.015043624), (2.414187993, 0))
        make_face()
    extrude(amount=18.733398802, mode=Mode.SUBTRACT)
    with BuildSketch(Plane(origin=(17.09084068, -100.1522, 15.702548989), x_dir=(0.18100537272748396, 0.9834821071294508, 0), z_dir=(0, 0, -1))) as fillet4_2_piece_4:
        with BuildLine():
            CenterArc((3.702197139, 2.527980078), FILLET4_R, 157.777700038, 106.646039912)
            ThreePointArc((1.35085956, 3.488610908), (0.659371626, 1.750523491), (0, 0))
            ThreePointArc((0, 0), (1.727691998, 0.084139457), (3.455383996, 0))
        make_face()
    extrude(amount=25.055097979, mode=Mode.SUBTRACT)

    # Fillet5
    fillet5_edges = [part.edges().sort_by_distance(p)[0] for p in [
        (-26.909050546, -40.273280762, 3.175),
        (-13.709636762, -46.4551397, 3.175),
        (-39.676347356, 27.781677508, 3.175),
        (-47.700026827, 8.41080171, 3.175),
        (-17.09084068, -100.1522, 3.175),
    ]]
    fillet(fillet5_edges, radius=FILLET5_R)

    # Fillet6
    fillet6_edges = [part.edges().sort_by_distance(p)[0] for p in [
        (-29.843941288, -38.149355343, 3.175),
        (-39.676347356, -27.781677508, 3.175),
        (38.149355343, 29.843941288, 3.175),
        (29.843941288, 38.149355343, 3.175),
    ]]
    fillet(fillet6_edges, radius=FILLET6_R)

    # Fillet9
    fillet9_edges = [part.edges().sort_by_distance(p)[0] for p in [
        (-38.544806548, 56.41577939, 3.175),
        (36.978423652, 57.45466439, 3.175),
    ]]
    fillet(fillet9_edges, radius=FILLET9_R)


solid = part.part
